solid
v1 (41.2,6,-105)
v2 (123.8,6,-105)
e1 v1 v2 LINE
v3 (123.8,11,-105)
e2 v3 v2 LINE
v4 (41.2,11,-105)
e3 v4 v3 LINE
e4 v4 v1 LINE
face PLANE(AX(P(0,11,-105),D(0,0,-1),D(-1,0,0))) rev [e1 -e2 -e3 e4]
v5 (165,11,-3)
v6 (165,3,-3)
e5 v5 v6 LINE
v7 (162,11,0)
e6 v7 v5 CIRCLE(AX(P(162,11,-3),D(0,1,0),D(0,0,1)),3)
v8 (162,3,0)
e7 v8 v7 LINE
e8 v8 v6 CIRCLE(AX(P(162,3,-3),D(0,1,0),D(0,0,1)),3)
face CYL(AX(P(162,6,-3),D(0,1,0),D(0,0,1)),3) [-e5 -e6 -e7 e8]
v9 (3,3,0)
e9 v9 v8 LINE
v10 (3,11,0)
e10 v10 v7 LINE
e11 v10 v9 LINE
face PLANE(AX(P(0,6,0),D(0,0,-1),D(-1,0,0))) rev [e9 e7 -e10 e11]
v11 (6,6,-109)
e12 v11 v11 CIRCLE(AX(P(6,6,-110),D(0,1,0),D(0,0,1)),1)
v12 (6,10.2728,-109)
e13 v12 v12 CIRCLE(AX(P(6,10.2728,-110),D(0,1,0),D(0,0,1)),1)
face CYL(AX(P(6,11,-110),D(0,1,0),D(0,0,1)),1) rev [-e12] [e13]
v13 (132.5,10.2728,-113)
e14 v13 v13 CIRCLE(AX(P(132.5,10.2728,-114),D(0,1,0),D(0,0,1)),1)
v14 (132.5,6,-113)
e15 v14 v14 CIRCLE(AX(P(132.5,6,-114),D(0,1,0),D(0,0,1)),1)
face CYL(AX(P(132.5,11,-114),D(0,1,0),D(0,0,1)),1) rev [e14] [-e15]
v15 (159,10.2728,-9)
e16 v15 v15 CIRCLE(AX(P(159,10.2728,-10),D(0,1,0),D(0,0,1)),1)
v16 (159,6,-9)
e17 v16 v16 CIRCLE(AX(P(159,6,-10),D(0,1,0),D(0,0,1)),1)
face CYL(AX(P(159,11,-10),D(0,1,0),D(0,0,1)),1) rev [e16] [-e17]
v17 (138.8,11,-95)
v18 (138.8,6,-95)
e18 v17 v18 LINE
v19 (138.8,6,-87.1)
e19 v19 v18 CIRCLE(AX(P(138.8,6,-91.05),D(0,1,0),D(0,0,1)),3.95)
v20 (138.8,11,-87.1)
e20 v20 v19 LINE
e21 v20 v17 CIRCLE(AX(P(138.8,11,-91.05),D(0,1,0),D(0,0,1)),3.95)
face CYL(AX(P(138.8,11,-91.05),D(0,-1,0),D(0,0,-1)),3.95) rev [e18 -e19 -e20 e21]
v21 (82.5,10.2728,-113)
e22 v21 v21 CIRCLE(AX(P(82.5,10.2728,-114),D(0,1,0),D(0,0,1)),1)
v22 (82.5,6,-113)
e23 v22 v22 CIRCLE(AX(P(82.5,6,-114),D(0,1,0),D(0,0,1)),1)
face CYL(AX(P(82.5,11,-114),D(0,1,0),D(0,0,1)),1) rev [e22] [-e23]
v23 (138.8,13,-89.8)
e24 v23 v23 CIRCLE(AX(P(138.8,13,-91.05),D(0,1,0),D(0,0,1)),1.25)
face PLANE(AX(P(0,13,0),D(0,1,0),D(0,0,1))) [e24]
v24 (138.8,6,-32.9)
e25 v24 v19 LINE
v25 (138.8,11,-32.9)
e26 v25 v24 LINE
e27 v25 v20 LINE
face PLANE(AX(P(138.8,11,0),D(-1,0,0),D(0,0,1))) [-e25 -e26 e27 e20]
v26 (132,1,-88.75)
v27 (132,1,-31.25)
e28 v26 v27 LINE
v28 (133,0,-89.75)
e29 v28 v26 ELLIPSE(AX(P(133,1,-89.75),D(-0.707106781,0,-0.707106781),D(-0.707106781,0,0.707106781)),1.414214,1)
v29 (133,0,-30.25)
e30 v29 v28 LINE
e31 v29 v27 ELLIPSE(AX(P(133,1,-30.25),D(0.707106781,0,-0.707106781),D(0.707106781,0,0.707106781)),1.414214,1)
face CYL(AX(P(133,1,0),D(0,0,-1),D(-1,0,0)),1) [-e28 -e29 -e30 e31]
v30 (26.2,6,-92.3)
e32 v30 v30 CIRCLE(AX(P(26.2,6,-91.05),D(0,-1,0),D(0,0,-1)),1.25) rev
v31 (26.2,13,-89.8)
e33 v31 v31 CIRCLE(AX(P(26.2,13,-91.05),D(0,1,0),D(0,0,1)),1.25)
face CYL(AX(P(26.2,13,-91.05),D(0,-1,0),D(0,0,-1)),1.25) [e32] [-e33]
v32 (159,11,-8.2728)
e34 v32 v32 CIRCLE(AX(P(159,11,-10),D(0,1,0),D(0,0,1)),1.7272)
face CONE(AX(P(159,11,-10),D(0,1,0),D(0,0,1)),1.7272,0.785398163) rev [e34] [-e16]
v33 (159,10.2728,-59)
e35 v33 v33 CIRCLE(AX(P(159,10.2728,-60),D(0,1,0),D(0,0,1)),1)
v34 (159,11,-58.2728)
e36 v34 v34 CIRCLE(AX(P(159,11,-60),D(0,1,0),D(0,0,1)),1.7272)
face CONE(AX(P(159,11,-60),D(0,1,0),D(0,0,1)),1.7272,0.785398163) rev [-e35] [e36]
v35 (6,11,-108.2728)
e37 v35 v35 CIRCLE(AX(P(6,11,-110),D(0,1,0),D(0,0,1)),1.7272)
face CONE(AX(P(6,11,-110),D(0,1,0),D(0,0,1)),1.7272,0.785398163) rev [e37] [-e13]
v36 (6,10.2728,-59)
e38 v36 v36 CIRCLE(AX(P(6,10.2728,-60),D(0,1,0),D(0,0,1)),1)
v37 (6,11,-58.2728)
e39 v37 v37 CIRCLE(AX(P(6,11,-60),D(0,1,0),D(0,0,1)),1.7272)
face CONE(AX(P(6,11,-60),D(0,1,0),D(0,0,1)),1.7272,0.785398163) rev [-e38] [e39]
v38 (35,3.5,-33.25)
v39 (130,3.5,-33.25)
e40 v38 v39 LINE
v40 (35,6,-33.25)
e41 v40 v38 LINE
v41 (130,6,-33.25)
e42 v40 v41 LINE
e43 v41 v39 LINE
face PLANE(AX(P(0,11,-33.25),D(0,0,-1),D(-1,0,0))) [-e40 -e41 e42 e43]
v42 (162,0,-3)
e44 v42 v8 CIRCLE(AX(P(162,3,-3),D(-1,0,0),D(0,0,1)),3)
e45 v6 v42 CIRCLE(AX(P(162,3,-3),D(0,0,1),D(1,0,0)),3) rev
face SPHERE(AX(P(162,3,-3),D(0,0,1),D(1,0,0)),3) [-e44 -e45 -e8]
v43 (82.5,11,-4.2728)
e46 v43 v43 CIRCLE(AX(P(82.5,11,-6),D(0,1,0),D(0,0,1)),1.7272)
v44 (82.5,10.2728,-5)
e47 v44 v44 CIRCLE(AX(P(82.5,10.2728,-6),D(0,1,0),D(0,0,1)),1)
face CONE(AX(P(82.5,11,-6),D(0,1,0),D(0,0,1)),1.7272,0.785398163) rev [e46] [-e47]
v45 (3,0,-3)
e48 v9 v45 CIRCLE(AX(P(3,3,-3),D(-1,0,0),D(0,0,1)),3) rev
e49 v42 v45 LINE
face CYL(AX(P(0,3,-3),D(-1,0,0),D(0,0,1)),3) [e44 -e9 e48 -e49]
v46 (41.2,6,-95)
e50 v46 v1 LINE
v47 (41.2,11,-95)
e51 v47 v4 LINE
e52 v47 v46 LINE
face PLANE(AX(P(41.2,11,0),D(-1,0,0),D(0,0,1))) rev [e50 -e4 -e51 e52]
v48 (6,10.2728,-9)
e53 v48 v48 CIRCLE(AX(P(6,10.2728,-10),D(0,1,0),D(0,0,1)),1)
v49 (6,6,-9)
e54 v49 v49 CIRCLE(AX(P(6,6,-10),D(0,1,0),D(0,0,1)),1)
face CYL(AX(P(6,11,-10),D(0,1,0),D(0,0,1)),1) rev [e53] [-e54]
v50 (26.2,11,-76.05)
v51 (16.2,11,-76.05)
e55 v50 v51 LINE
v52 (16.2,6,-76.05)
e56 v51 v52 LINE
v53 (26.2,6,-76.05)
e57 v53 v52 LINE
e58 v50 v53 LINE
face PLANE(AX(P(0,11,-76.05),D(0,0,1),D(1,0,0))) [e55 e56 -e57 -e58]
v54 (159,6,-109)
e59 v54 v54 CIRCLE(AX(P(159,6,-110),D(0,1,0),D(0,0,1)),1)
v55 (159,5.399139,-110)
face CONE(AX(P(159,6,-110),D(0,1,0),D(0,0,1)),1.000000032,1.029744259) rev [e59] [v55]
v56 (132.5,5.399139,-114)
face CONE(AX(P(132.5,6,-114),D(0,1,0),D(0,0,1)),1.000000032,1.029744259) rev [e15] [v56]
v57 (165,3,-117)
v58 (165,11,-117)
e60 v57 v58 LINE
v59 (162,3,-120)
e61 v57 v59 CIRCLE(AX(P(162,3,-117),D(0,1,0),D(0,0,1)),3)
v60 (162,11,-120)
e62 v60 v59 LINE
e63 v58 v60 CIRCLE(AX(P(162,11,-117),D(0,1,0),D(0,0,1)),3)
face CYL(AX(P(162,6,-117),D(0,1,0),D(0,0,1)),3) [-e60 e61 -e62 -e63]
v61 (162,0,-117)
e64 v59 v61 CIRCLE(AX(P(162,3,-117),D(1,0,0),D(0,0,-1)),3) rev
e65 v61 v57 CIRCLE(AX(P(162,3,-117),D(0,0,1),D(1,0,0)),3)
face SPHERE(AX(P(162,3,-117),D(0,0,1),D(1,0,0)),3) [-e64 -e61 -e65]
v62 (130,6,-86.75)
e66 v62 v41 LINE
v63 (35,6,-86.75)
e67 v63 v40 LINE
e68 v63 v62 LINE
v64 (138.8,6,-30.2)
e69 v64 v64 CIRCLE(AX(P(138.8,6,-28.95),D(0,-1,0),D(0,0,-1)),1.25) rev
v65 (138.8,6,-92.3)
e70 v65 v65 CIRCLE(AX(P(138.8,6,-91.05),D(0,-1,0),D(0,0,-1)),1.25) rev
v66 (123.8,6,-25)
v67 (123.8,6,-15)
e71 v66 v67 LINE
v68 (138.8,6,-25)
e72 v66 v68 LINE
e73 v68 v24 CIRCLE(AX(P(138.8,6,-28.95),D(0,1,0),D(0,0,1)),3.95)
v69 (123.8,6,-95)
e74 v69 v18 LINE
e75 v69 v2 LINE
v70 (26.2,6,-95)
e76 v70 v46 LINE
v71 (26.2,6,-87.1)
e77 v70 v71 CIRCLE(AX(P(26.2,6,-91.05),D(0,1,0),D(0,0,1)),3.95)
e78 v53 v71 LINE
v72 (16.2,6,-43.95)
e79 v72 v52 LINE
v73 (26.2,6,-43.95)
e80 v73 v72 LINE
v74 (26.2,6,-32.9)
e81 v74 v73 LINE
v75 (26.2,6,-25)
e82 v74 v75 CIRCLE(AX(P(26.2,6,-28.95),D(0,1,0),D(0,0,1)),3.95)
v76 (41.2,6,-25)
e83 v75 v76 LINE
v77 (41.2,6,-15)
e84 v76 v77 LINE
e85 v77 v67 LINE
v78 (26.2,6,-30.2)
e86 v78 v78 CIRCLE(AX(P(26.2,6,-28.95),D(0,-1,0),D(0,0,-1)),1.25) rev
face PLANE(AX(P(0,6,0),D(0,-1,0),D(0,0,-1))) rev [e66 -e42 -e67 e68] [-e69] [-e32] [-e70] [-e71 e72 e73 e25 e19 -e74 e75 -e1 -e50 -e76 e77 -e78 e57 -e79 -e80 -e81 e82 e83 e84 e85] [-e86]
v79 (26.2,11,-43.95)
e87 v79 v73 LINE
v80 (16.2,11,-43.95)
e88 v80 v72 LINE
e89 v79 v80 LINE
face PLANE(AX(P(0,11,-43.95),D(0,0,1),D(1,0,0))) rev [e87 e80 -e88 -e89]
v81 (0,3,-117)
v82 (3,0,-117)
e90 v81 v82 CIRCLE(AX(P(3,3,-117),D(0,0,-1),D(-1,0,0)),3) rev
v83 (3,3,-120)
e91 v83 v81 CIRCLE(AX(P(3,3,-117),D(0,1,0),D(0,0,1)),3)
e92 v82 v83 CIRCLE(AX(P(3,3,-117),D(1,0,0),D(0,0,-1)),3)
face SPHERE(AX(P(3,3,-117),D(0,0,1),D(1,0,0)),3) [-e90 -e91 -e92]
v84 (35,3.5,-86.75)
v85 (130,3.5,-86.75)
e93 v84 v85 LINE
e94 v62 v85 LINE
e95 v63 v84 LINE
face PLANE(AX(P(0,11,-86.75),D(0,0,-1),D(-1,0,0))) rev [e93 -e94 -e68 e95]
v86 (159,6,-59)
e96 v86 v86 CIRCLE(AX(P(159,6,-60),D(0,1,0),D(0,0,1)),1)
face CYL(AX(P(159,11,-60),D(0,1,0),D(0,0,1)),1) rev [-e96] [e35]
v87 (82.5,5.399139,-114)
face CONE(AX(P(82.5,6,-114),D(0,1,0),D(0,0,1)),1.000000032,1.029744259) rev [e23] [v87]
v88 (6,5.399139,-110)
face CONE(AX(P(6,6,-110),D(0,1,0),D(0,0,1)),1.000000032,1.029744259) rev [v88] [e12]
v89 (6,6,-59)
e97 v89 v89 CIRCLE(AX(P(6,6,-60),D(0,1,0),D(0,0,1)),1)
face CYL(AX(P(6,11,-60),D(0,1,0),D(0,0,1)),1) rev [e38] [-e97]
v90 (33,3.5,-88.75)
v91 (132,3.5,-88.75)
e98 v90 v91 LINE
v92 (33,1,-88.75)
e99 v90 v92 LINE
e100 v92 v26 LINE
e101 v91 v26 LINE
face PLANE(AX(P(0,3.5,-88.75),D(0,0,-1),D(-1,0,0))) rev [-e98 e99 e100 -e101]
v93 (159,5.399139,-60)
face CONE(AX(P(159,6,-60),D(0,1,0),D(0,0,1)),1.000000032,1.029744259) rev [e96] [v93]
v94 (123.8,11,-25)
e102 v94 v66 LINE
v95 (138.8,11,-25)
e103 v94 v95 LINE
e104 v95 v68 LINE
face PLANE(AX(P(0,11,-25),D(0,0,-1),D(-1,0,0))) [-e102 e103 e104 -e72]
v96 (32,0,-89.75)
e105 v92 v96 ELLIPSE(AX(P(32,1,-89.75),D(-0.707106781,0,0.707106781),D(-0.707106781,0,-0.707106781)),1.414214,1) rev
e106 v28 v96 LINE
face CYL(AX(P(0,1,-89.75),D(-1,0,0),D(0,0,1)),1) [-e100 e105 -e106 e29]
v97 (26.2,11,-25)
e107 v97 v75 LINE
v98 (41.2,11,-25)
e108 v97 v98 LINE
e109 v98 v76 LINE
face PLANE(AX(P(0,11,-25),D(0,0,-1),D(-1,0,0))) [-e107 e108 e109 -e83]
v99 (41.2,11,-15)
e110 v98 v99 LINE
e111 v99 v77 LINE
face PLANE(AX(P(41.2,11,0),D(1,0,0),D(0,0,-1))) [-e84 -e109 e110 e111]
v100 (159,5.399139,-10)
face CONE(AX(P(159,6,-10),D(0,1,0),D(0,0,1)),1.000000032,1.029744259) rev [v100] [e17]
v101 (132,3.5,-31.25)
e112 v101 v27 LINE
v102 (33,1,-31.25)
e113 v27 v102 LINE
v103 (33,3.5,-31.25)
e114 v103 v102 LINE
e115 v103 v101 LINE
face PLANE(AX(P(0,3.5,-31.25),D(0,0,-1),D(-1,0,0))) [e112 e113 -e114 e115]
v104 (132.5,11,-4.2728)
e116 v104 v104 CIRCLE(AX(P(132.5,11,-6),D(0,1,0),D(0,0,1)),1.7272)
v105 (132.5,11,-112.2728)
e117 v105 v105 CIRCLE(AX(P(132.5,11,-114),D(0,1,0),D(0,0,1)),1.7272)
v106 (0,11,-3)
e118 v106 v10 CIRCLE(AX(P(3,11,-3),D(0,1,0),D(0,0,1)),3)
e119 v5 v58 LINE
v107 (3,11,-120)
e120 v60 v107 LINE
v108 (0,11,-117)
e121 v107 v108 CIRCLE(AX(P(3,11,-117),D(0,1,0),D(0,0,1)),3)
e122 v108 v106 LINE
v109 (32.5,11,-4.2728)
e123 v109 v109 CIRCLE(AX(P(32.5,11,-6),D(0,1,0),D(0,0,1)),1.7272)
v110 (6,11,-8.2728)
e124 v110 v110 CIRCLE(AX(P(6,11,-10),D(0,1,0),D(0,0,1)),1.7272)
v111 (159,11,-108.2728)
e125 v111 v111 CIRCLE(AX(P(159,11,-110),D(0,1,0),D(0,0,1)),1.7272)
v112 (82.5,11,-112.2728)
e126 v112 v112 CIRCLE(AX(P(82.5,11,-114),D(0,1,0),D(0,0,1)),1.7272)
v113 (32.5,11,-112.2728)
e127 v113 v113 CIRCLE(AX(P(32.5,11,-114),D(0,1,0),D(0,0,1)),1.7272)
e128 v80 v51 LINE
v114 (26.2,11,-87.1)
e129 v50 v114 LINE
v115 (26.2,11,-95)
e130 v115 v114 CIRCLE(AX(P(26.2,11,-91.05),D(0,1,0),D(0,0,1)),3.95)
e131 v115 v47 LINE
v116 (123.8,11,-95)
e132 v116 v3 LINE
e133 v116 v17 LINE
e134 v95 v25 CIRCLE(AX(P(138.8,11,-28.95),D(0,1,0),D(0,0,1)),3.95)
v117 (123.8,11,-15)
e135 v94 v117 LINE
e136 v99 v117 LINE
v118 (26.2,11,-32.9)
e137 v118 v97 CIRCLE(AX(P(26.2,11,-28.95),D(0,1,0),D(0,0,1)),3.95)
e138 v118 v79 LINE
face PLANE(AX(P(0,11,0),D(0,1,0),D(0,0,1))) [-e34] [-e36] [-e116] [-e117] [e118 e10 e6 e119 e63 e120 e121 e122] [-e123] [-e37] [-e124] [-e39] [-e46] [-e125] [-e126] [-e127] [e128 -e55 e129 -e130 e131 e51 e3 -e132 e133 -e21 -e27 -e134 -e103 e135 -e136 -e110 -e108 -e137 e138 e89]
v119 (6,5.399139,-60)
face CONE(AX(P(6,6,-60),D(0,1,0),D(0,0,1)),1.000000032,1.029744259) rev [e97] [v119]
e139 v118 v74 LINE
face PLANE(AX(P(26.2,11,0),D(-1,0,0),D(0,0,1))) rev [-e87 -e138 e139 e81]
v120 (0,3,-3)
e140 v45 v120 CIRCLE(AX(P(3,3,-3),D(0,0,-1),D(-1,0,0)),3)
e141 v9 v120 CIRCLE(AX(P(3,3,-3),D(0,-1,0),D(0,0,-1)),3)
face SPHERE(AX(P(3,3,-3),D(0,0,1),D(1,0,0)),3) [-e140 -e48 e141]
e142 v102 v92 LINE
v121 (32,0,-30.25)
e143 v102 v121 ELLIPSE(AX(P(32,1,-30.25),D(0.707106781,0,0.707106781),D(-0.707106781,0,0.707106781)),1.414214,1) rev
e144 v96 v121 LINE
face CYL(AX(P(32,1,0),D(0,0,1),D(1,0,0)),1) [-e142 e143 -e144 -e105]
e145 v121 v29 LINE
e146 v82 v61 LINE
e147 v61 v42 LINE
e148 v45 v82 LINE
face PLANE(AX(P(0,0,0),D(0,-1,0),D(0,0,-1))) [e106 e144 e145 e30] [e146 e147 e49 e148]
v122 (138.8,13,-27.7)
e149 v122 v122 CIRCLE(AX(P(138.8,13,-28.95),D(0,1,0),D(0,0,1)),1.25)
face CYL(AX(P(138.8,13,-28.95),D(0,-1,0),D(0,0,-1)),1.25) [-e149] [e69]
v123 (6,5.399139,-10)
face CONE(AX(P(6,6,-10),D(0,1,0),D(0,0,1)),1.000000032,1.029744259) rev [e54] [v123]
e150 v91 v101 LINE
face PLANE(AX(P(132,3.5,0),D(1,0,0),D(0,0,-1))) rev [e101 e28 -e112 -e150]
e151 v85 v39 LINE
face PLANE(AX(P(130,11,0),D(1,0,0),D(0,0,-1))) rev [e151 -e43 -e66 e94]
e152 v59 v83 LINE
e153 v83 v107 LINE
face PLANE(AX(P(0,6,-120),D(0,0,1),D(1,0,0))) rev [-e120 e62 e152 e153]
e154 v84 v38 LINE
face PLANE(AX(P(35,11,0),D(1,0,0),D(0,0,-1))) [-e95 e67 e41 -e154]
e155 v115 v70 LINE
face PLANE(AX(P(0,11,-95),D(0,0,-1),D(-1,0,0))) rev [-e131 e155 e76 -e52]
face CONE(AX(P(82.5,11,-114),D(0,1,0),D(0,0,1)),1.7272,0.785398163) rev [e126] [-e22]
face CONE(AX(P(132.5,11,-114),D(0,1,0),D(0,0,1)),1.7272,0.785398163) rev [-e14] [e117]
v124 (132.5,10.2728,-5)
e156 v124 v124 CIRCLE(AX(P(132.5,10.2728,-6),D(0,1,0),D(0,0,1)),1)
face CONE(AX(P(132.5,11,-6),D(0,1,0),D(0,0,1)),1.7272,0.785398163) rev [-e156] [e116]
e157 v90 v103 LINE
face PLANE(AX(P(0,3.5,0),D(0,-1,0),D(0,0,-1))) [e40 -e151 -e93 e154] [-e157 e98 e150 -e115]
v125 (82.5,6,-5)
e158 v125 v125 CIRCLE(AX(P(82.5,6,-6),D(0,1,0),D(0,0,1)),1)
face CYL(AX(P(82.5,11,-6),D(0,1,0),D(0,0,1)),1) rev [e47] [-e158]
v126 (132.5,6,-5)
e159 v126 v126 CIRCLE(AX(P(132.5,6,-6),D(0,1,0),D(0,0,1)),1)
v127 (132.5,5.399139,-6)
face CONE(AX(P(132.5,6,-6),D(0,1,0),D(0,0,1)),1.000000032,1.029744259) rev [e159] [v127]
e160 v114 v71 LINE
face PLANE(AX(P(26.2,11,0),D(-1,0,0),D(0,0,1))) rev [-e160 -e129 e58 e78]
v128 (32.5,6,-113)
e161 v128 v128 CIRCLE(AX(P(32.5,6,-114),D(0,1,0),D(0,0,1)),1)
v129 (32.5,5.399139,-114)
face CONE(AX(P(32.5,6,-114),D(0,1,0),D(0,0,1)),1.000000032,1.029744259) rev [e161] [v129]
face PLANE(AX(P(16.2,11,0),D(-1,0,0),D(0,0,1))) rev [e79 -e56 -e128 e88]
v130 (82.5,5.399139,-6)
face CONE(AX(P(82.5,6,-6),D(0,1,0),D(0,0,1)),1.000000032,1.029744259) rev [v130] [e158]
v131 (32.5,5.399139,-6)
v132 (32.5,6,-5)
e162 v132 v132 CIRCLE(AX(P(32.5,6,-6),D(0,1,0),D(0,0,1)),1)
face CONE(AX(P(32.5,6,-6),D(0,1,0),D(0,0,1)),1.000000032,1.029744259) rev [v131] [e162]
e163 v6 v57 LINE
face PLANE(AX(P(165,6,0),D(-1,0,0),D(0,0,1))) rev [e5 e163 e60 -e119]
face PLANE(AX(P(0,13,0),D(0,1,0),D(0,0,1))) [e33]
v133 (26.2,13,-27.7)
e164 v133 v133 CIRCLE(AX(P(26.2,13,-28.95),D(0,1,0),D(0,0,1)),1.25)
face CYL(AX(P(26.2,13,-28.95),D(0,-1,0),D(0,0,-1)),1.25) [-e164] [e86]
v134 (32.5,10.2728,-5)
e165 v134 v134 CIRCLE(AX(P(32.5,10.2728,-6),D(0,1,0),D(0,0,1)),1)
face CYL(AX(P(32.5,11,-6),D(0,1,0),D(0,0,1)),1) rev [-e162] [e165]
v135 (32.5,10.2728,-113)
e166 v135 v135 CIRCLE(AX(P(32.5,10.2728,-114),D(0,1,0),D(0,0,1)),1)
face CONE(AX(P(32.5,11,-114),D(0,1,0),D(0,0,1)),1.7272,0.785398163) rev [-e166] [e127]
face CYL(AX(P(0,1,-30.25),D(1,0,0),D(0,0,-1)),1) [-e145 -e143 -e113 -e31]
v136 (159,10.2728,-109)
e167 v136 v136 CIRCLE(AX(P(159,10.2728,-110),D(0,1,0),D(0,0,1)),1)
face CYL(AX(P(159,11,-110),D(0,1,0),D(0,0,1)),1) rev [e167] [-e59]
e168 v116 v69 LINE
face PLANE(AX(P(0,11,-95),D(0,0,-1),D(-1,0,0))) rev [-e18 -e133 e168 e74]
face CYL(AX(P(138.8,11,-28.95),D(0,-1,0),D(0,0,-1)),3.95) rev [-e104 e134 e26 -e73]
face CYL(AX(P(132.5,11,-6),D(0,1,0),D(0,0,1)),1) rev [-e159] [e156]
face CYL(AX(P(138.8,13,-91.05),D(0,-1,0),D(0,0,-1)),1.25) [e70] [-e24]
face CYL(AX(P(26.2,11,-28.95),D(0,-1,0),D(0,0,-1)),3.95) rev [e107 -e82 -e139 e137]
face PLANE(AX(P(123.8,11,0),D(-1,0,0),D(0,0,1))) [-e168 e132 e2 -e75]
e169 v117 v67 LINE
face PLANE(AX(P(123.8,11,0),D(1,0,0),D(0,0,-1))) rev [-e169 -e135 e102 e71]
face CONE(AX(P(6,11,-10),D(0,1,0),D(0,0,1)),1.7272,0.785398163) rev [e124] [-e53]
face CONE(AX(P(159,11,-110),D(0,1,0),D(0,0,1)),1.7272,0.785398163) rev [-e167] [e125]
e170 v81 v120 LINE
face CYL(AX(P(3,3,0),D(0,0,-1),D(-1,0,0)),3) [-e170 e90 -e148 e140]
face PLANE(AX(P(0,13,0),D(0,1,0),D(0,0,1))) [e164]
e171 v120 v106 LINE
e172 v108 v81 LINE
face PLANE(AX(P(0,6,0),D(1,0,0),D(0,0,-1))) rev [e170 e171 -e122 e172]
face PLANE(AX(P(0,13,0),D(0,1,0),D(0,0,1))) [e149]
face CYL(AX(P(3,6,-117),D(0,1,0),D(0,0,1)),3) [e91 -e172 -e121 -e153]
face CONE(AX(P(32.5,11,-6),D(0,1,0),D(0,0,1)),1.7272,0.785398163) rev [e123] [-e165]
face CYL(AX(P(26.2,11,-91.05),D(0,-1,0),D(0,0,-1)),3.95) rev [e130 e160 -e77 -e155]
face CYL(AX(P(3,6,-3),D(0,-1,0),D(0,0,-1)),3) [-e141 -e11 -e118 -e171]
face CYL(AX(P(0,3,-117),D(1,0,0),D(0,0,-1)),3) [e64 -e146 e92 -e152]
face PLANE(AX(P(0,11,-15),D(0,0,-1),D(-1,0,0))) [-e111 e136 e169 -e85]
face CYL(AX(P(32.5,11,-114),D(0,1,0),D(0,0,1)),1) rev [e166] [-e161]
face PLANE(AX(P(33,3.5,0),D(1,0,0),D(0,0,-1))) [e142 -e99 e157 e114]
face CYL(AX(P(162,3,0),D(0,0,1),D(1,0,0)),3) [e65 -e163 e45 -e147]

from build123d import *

# Parameters (mm, degrees)
SKETCH1_W                      = 165
SKETCH1_H                      = 120
BOSS_EXTRUDE1_DEPTH            = 6
SKETCH3_W                      = 165
SKETCH3_H                      = 120
SKETCH3_W_2                    = 155
SKETCH3_H_2                    = 110
BOSS_EXTRUDE2_DEPTH            = 5
SKETCH4_W                      = 47.5
SKETCH4_H                      = 26.75
ACRYLIC_CUTOUT_3MM_DEPTH       = 205.318379007
ACRYLIC_LIP_DEPTH              = 3.5
PEGS_DEPTH                     = 7
SKETCH5_4_W                    = 155
SKETCH5_4_H                    = 110
BOSS_EXTRUDE4_DEPTH            = 5
FILLET1_R                      = 3
FILLET2_R                      = 1
FILLET3_R                      = 3
FILLET4_R                      = 3
FILLET5_R                      = 3
FILLET6_R                      = 3
F_2_64_TAPPED_HOLE1_AT_2_COUNT = 2
F_2_64_TAPPED_HOLE1_AT_2_PITCH = 50
F_2_64_TAPPED_HOLE1_AT_3_COUNT = 2
F_2_64_TAPPED_HOLE1_AT_3_PITCH = 60.151891076
F_2_64_TAPPED_HOLE1_AT_4_COUNT = 2
F_2_64_TAPPED_HOLE1_AT_4_PITCH = 93.63893421


with BuildPart() as part:
    # Sketch1 → Boss-Extrude1 (new body)
    with BuildSketch(Plane(origin=(0, 0, 0), x_dir=(1, 0, 0), z_dir=(0, 1, 0))):
        with Locations((82.5, 60)):
            Rectangle(SKETCH1_W, SKETCH1_H)
    extrude(amount=BOSS_EXTRUDE1_DEPTH)

    # Sketch3 → Boss-Extrude2 (add)
    with BuildSketch(Plane(origin=(0, 6, 0), x_dir=(1, 0, 0), z_dir=(0, 1, 0))):
        with Locations((82.5, 60)):
            Rectangle(SKETCH3_W, SKETCH3_H)
        with Locations((82.5, 60)):
            Rectangle(SKETCH3_W_2, SKETCH3_H_2, mode=Mode.SUBTRACT)
    extrude(amount=BOSS_EXTRUDE2_DEPTH)

    # Sketch4 → Acrylic Cutout_3mm (cut, through all)
    with BuildSketch(Plane.XZ):
        with Locations((58.75, -46.625)):
            Rectangle(SKETCH4_W, SKETCH4_H)
        with Locations((58.75, -73.375)):
            Rectangle(SKETCH4_W, SKETCH4_H)
        with Locations((106.25, -73.375)):
            Rectangle(SKETCH4_W, SKETCH4_H)
        with Locations((106.25, -46.625)):
            Rectangle(SKETCH4_W, SKETCH4_H)
    extrude(amount=-ACRYLIC_CUTOUT_3MM_DEPTH, mode=Mode.SUBTRACT)

    # Sketch4<4> → Acrylic Lip (cut)
    with BuildSketch(Plane.XZ):
        Polygon((82.5, -33.25), (82.5, -31.25), (33, -31.25), (33, -60), (35, -60), (35, -33.25), align=None)
        Polygon((35, -60), (33, -60), (33, -88.75), (82.5, -88.75), (82.5, -86.75), (35, -86.75), align=None)
        Polygon((132, -88.75), (132, -60), (130, -60), (130, -86.75), (82.5, -86.75), (82.5, -88.75), align=None)
        Polygon((132, -31.25), (82.5, -31.25), (82.5, -33.25), (130, -33.25), (130, -60), (132, -60), align=None)
    extrude(amount=-ACRYLIC_LIP_DEPTH, mode=Mode.SUBTRACT)

    # Sketch5 → Pegs (add)
    with BuildSketch(Plane(origin=(0, 6, 0), x_dir=(1, 0, 0), z_dir=(0, 1, 0))):
        with BuildLine():
            ThreePointArc((26.2, 89.8), (27.083883476, 90.166116524), (27.45, 91.05))
            Line((27.45, 91.05), (26.2, 91.05))
            Line((26.2, 91.05), (26.2, 89.8))
        make_face()
        with BuildLine():
            Line((26.2, 91.05), (27.45, 91.05))
            ThreePointArc((27.45, 91.05), (25.316116524, 91.933883476), (26.2, 89.8))
            Line((26.2, 89.8), (26.2, 91.05))
        make_face()
        with BuildLine():
            ThreePointArc((26.2, 30.2), (25.316116524, 28.066116524), (27.45, 28.95))
            Line((27.45, 28.95), (26.2, 28.95))
            Line((26.2, 28.95), (26.2, 30.2))
        make_face()
        with BuildLine():
            Line((26.2, 28.95), (27.45, 28.95))
            ThreePointArc((27.45, 28.95), (27.083883476, 29.833883476), (26.2, 30.2))
            Line((26.2, 30.2), (26.2, 28.95))
        make_face()
        with BuildLine():
            ThreePointArc((140.05, 28.95), (139.683883476, 29.833883476), (138.8, 30.2))
            Line((138.8, 30.2), (138.8, 28.95))
            Line((138.8, 28.95), (137.55, 28.95))
            ThreePointArc((137.55, 28.95), (138.8, 27.7), (140.05, 28.95))
        make_face()
        with BuildLine():
            Line((138.8, 28.95), (138.8, 30.2))
            ThreePointArc((138.8, 30.2), (137.916116524, 29.833883476), (137.55, 28.95))
            Line((137.55, 28.95), (138.8, 28.95))
        make_face()
        with BuildLine():
            ThreePointArc((140.05, 91.05), (138.8, 92.3), (137.55, 91.05))
            Line((137.55, 91.05), (138.8, 91.05))
            Line((138.8, 91.05), (138.8, 89.8))
            ThreePointArc((138.8, 89.8), (139.683883476, 90.166116524), (140.05, 91.05))
        make_face()
        with BuildLine():
            Line((138.8, 91.05), (137.55, 91.05))
            ThreePointArc((137.55, 91.05), (137.916116524, 90.166116524), (138.8, 89.8))
            Line((138.8, 89.8), (138.8, 91.05))
        make_face()
    extrude(amount=PEGS_DEPTH)

    # Sketch5<4> → Boss-Extrude4 (add)
    with BuildSketch(Plane(origin=(0, 6, 0), x_dir=(1, 0, 0), z_dir=(0, 1, 0))):
        with Locations((82.5, 60)):
            Rectangle(SKETCH5_4_W, SKETCH5_4_H)
        with BuildLine():
            Line((41.2, 15), (41.2, 25))
            Line((41.2, 25), (26.2, 25))
            ThreePointArc((26.2, 25), (22.25, 28.95), (26.2, 32.9))
            Line((26.2, 32.9), (26.2, 43.95))
            Line((26.2, 43.95), (16.2, 43.95))
            Line((16.2, 43.95), (16.2, 76.05))
            Line((16.2, 76.05), (26.2, 76.05))
            Line((26.2, 76.05), (26.2, 87.1))
            ThreePointArc((26.2, 87.1), (22.25, 91.05), (26.2, 95))
            Line((26.2, 95), (41.2, 95))
            Line((41.2, 95), (41.2, 105))
            Line((41.2, 105), (123.8, 105))
            Line((123.8, 105), (123.8, 95))
            Line((123.8, 95), (138.8, 95))
            ThreePointArc((138.8, 95), (142.75, 91.05), (138.8, 87.1))
            Line((138.8, 87.1), (138.8, 32.9))
            ThreePointArc((138.8, 32.9), (142.75, 28.95), (138.8, 25))
            Line((138.8, 25), (123.8, 25))
            Line((123.8, 25), (123.8, 15))
            Line((123.8, 15), (41.2, 15))
        make_face(mode=Mode.SUBTRACT)
    extrude(amount=BOSS_EXTRUDE4_DEPTH)

    # Fillet1
    fillet1_edges = [part.edges().sort_by_distance(p)[0] for p in [
        (82.5, 0, -120),
        (165, 0, -60),
        (82.5, 0, 0),
        (0, 0, -60),
    ]]
    fillet(fillet1_edges, radius=FILLET1_R)

    # Fillet2
    fillet2_edges = [part.edges().sort_by_distance(p)[0] for p in [
        (33, 0, -60),
        (82.5, 0, -31.25),
        (82.5, 0, -88.75),
        (132, 0, -60),
    ]]
    fillet(fillet2_edges, radius=FILLET2_R)

    # Fillet3
    # the kernel refuses this fillet: 3 mm, written as the material it takes off along each edge
    with BuildSketch(Plane(origin=(3, 3, -117), x_dir=(-1, 0, 0), z_dir=(0, 0, -1))) as fillet3_piece_1_section:
        Polygon((0, 0), (FILLET3_R, 0), (FILLET3_R, -FILLET3_R), (0, -FILLET3_R), align=None)
    fillet3_piece_1 = extrude(amount=FILLET3_R, mode=Mode.PRIVATE)
    fillet3_piece_1 = fillet3_piece_1 - Plane(origin=(3, 3, -117), x_dir=(0.7071067811865475, 0.7071067811865475, 0), z_dir=(0, 0, -1)) * Sphere(FILLET3_R, mode=Mode.PRIVATE)
    add(fillet3_piece_1, mode=Mode.SUBTRACT)
    with BuildSketch(Plane(origin=(0, 18.5, -120), x_dir=(1, 0, 0), z_dir=(0, -1, 0))) as fillet3_piece_2:
        with BuildLine():
            CenterArc((FILLET3_R, FILLET3_R), FILLET3_R, 180, 90)
            Line((0, FILLET3_R), (0, 0))
            Line((0, 0), (FILLET3_R, 0))
        make_face()
    extrude(amount=15.5, mode=Mode.SUBTRACT)

    # Fillet4
    # the kernel refuses this fillet: 3 mm, written as the material it takes off along each edge
    with BuildSketch(Plane(origin=(162, 3, -117), x_dir=(1, 0, 0), z_dir=(0, 0, -1))) as fillet4_piece_1_section:
        Polygon((0, 0), (FILLET4_R, 0), (FILLET4_R, FILLET4_R), (0, FILLET4_R), align=None)
    fillet4_piece_1 = extrude(amount=FILLET4_R, mode=Mode.PRIVATE)
    fillet4_piece_1 = fillet4_piece_1 - Plane(origin=(162, 3, -117), x_dir=(-0.7071067811865475, 0.7071067811865475, 0), z_dir=(0, 0, -1)) * Sphere(FILLET4_R, mode=Mode.PRIVATE)
    add(fillet4_piece_1, mode=Mode.SUBTRACT)
    with BuildSketch(Plane(origin=(165, 3, -120), x_dir=(-1, 0, 0), z_dir=(0, 1, 0))) as fillet4_piece_2:
        with BuildLine():
            CenterArc((FILLET4_R, FILLET4_R), FILLET4_R, 180, 90)
            Line((0, FILLET4_R), (0, 0))
            Line((0, 0), (FILLET4_R, 0))
        make_face()
    extrude(amount=15.5, mode=Mode.SUBTRACT)

    # Fillet5
    # the kernel refuses this fillet: 3 mm, written as the material it takes off along each edge
    with BuildSketch(Plane(origin=(162, 3, -3), x_dir=(0, 0, 1), z_dir=(1, 0, 0))) as fillet5_piece_1_section:
        Polygon((0, 0), (FILLET5_R, 0), (FILLET5_R, FILLET5_R), (0, FILLET5_R), align=None)
    fillet5_piece_1 = extrude(amount=FILLET5_R, mode=Mode.PRIVATE)
    fillet5_piece_1 = fillet5_piece_1 - Plane(origin=(162, 3, -3), x_dir=(0, 0.7071067811865475, -0.7071067811865475), z_dir=(1, 0, 0)) * Sphere(FILLET5_R, mode=Mode.PRIVATE)
    add(fillet5_piece_1, mode=Mode.SUBTRACT)
    with BuildSketch(Plane(origin=(165, 3, 0), x_dir=(0, 0, -1), z_dir=(0, 1, 0))) as fillet5_piece_2:
        with BuildLine():
            CenterArc((FILLET5_R, FILLET5_R), FILLET5_R, 180, 90)
            Line((0, FILLET5_R), (0, 0))
            Line((0, 0), (FILLET5_R, 0))
        make_face()
    extrude(amount=15.5, mode=Mode.SUBTRACT)

    # Fillet6
    # the kernel refuses this fillet: 3 mm, written as the material it takes off along each edge
    with BuildSketch(Plane(origin=(3, 3, -3), x_dir=(0, 0, 1), z_dir=(-1, 0, 0))) as fillet6_piece_1_section:
        Polygon((0, 0), (FILLET6_R, 0), (FILLET6_R, -FILLET6_R), (0, -FILLET6_R), align=None)
    fillet6_piece_1 = extrude(amount=FILLET6_R, mode=Mode.PRIVATE)
    fillet6_piece_1 = fillet6_piece_1 - Plane(origin=(3, 3, -3), x_dir=(0, 0.7071067811865475, -0.7071067811865475), z_dir=(-1, 0, 0)) * Sphere(FILLET6_R, mode=Mode.PRIVATE)
    add(fillet6_piece_1, mode=Mode.SUBTRACT)
    with BuildSketch(Plane(origin=(0, 18.5, 0), x_dir=(0, 0, -1), z_dir=(0, -1, 0))) as fillet6_piece_2:
        with BuildLine():
            CenterArc((FILLET6_R, FILLET6_R), FILLET6_R, 180, 90)
            Line((0, FILLET6_R), (0, 0))
            Line((0, 0), (FILLET6_R, 0))
        make_face()
    extrude(amount=15.5, mode=Mode.SUBTRACT)

    # Sketch8 → #2-64 Tapped Hole1 (revolve, cut)
    with BuildSketch(Plane(origin=(6, 11, -60), x_dir=(0, 0, 1), z_dir=(1, 0, 0))):
        Polygon((0, 0), (0, 5.600860638), (1.000000032, 5), (1.000000032, 0.727199968), (1.7272, 0), align=None)
    f_2_64_tapped_hole1 = revolve(axis=Axis((6, 17.35, -60), (0, -1, 0)), mode=Mode.SUBTRACT)

    # #2-64 Tapped Hole1 at 2: #2-64 Tapped Hole1 ×2
    with Locations(*[(0, 0, -i * F_2_64_TAPPED_HOLE1_AT_2_PITCH) for i in range(1, F_2_64_TAPPED_HOLE1_AT_2_COUNT)]):
        add(f_2_64_tapped_hole1, mode=Mode.SUBTRACT)

    # #2-64 Tapped Hole1 at 3: #2-64 Tapped Hole1 ×2
    with Locations(*[Vector(0.4405514028908514, 0, -0.8977273870228661) * (i * F_2_64_TAPPED_HOLE1_AT_3_PITCH) for i in range(1, F_2_64_TAPPED_HOLE1_AT_3_COUNT)]):
        add(f_2_64_tapped_hole1, mode=Mode.SUBTRACT)

    # #2-64 Tapped Hole1 at 4: #2-64 Tapped Hole1 ×2
    with Locations(*[Vector(0.8169678632647619, 0, -0.5766831975986552) * (i * F_2_64_TAPPED_HOLE1_AT_4_PITCH) for i in range(1, F_2_64_TAPPED_HOLE1_AT_4_COUNT)]):
        add(f_2_64_tapped_hole1, mode=Mode.SUBTRACT)

    # Mirror1: #2-64 Tapped Hole1 across plane
    add(f_2_64_tapped_hole1.mirror(Plane(origin=(82.5, 0, 0), x_dir=(0, 0, 1), z_dir=(1, 0, 0))), mode=Mode.SUBTRACT)

    # Mirror1 copy 1 sketch → Mirror1 copy 1 (revolve, cut)
    with BuildSketch(Plane(origin=(159, 11, -110), x_dir=(0, 0, 1), z_dir=(-1, 0, 0))):
        Polygon((0, 0), (0, -5.600860638), (1.000000032, -5), (1.000000032, -0.727199968), (1.7272, 0), align=None)
    revolve(axis=Axis((159, 17.35, -110), (0, 1, 0)), mode=Mode.SUBTRACT)

    # Mirror1 copy 2 sketch → Mirror1 copy 2 (revolve, cut)
    with BuildSketch(Plane(origin=(132.5, 11, -114), x_dir=(0, 0, 1), z_dir=(-1, 0, 0))):
        Polygon((0, 0), (0, -5.600860638), (1.000000032, -5), (1.000000032, -0.727199968), (1.7272, 0), align=None)
    revolve(axis=Axis((132.5, 17.35, -114), (0, 1, 0)), mode=Mode.SUBTRACT)

    # Mirror1 copy 3 sketch → Mirror1 copy 3 (revolve, cut)
    with BuildSketch(Plane(origin=(82.5, 11, -114), x_dir=(0, 0, 1), z_dir=(-1, 0, 0))):
        Polygon((0, 0), (0, -5.600860638), (1.000000032, -5), (1.000000032, -0.727199968), (1.7272, 0), align=None)
    revolve(axis=Axis((82.5, 17.35, -114), (0, 1, 0)), mode=Mode.SUBTRACT)

    # Mirror1 at the second plane: #2-64 Tapped Hole1 across plane
    add(f_2_64_tapped_hole1.mirror(Plane.XY.offset(-60)), mode=Mode.SUBTRACT)

    # Mirror1 at the second plane copy 1 sketc → Mirror1 at the second plane copy 1 (revolve, cut)
    with BuildSketch(Plane(origin=(6, 11, -10), x_dir=(0, 0, -1), z_dir=(1, 0, 0))):
        Polygon((0, 0), (0, -5.600860638), (1.000000032, -5), (1.000000032, -0.727199968), (1.7272, 0), align=None)
    revolve(axis=Axis((6, 17.35, -10), (0, 1, 0)), mode=Mode.SUBTRACT)

    # Mirror1 at the second plane copy 2 sketc → Mirror1 at the second plane copy 2 (revolve, cut)
    with BuildSketch(Plane(origin=(32.5, 11, -6), x_dir=(0, 0, -1), z_dir=(1, 0, 0))):
        Polygon((0, 0), (0, -5.600860638), (1.000000032, -5), (1.000000032, -0.727199968), (1.7272, 0), align=None)
    revolve(axis=Axis((32.5, 17.35, -6), (0, 1, 0)), mode=Mode.SUBTRACT)

    # Mirror1 at the second plane copy 3 sketc → Mirror1 at the second plane copy 3 (revolve, cut)
    with BuildSketch(Plane(origin=(82.5, 11, -6), x_dir=(0, 0, -1), z_dir=(1, 0, 0))):
        Polygon((0, 0), (0, -5.600860638), (1.000000032, -5), (1.000000032, -0.727199968), (1.7272, 0), align=None)
    revolve(axis=Axis((82.5, 17.35, -6), (0, 1, 0)), mode=Mode.SUBTRACT)

    # Mirror1 at the second plane copy 4 sketc → Mirror1 at the second plane copy 4 (revolve, cut)
    with BuildSketch(Plane(origin=(159, 11, -60), x_dir=(0, 0, -1), z_dir=(-1, 0, 0))):
        Polygon((0, 0), (0, 5.600860638), (1.000000032, 5), (1.000000032, 0.727199968), (1.7272, 0), align=None)
    revolve(axis=Axis((159, 17.35, -60), (0, -1, 0)), mode=Mode.SUBTRACT)

    # Mirror1 at the second plane copy 5 sketc → Mirror1 at the second plane copy 5 (revolve, cut)
    with BuildSketch(Plane(origin=(159, 11, -10), x_dir=(0, 0, -1), z_dir=(-1, 0, 0))):
        Polygon((0, 0), (0, 5.600860638), (1.000000032, 5), (1.000000032, 0.727199968), (1.7272, 0), align=None)
    revolve(axis=Axis((159, 17.35, -10), (0, -1, 0)), mode=Mode.SUBTRACT)

    # Mirror1 at the second plane copy 6 sketc → Mirror1 at the second plane copy 6 (revolve, cut)
    with BuildSketch(Plane(origin=(132.5, 11, -6), x_dir=(0, 0, -1), z_dir=(-1, 0, 0))):
        Polygon((0, 0), (0, 5.600860638), (1.000000032, 5), (1.000000032, 0.727199968), (1.7272, 0), align=None)
    revolve(axis=Axis((132.5, 17.35, -6), (0, -1, 0)), mode=Mode.SUBTRACT)

    # Mirror1 at the second plane copy 7 sketc → Mirror1 at the second plane copy 7 (revolve, cut)
    with BuildSketch(Plane(origin=(82.5, 11, -6), x_dir=(0, 0, -1), z_dir=(-1, 0, 0))):
        Polygon((0, 0), (0, 5.600860638), (1.000000032, 5), (1.000000032, 0.727199968), (1.7272, 0), align=None)
    revolve(axis=Axis((82.5, 17.35, -6), (0, -1, 0)), mode=Mode.SUBTRACT)


solid = part.part
